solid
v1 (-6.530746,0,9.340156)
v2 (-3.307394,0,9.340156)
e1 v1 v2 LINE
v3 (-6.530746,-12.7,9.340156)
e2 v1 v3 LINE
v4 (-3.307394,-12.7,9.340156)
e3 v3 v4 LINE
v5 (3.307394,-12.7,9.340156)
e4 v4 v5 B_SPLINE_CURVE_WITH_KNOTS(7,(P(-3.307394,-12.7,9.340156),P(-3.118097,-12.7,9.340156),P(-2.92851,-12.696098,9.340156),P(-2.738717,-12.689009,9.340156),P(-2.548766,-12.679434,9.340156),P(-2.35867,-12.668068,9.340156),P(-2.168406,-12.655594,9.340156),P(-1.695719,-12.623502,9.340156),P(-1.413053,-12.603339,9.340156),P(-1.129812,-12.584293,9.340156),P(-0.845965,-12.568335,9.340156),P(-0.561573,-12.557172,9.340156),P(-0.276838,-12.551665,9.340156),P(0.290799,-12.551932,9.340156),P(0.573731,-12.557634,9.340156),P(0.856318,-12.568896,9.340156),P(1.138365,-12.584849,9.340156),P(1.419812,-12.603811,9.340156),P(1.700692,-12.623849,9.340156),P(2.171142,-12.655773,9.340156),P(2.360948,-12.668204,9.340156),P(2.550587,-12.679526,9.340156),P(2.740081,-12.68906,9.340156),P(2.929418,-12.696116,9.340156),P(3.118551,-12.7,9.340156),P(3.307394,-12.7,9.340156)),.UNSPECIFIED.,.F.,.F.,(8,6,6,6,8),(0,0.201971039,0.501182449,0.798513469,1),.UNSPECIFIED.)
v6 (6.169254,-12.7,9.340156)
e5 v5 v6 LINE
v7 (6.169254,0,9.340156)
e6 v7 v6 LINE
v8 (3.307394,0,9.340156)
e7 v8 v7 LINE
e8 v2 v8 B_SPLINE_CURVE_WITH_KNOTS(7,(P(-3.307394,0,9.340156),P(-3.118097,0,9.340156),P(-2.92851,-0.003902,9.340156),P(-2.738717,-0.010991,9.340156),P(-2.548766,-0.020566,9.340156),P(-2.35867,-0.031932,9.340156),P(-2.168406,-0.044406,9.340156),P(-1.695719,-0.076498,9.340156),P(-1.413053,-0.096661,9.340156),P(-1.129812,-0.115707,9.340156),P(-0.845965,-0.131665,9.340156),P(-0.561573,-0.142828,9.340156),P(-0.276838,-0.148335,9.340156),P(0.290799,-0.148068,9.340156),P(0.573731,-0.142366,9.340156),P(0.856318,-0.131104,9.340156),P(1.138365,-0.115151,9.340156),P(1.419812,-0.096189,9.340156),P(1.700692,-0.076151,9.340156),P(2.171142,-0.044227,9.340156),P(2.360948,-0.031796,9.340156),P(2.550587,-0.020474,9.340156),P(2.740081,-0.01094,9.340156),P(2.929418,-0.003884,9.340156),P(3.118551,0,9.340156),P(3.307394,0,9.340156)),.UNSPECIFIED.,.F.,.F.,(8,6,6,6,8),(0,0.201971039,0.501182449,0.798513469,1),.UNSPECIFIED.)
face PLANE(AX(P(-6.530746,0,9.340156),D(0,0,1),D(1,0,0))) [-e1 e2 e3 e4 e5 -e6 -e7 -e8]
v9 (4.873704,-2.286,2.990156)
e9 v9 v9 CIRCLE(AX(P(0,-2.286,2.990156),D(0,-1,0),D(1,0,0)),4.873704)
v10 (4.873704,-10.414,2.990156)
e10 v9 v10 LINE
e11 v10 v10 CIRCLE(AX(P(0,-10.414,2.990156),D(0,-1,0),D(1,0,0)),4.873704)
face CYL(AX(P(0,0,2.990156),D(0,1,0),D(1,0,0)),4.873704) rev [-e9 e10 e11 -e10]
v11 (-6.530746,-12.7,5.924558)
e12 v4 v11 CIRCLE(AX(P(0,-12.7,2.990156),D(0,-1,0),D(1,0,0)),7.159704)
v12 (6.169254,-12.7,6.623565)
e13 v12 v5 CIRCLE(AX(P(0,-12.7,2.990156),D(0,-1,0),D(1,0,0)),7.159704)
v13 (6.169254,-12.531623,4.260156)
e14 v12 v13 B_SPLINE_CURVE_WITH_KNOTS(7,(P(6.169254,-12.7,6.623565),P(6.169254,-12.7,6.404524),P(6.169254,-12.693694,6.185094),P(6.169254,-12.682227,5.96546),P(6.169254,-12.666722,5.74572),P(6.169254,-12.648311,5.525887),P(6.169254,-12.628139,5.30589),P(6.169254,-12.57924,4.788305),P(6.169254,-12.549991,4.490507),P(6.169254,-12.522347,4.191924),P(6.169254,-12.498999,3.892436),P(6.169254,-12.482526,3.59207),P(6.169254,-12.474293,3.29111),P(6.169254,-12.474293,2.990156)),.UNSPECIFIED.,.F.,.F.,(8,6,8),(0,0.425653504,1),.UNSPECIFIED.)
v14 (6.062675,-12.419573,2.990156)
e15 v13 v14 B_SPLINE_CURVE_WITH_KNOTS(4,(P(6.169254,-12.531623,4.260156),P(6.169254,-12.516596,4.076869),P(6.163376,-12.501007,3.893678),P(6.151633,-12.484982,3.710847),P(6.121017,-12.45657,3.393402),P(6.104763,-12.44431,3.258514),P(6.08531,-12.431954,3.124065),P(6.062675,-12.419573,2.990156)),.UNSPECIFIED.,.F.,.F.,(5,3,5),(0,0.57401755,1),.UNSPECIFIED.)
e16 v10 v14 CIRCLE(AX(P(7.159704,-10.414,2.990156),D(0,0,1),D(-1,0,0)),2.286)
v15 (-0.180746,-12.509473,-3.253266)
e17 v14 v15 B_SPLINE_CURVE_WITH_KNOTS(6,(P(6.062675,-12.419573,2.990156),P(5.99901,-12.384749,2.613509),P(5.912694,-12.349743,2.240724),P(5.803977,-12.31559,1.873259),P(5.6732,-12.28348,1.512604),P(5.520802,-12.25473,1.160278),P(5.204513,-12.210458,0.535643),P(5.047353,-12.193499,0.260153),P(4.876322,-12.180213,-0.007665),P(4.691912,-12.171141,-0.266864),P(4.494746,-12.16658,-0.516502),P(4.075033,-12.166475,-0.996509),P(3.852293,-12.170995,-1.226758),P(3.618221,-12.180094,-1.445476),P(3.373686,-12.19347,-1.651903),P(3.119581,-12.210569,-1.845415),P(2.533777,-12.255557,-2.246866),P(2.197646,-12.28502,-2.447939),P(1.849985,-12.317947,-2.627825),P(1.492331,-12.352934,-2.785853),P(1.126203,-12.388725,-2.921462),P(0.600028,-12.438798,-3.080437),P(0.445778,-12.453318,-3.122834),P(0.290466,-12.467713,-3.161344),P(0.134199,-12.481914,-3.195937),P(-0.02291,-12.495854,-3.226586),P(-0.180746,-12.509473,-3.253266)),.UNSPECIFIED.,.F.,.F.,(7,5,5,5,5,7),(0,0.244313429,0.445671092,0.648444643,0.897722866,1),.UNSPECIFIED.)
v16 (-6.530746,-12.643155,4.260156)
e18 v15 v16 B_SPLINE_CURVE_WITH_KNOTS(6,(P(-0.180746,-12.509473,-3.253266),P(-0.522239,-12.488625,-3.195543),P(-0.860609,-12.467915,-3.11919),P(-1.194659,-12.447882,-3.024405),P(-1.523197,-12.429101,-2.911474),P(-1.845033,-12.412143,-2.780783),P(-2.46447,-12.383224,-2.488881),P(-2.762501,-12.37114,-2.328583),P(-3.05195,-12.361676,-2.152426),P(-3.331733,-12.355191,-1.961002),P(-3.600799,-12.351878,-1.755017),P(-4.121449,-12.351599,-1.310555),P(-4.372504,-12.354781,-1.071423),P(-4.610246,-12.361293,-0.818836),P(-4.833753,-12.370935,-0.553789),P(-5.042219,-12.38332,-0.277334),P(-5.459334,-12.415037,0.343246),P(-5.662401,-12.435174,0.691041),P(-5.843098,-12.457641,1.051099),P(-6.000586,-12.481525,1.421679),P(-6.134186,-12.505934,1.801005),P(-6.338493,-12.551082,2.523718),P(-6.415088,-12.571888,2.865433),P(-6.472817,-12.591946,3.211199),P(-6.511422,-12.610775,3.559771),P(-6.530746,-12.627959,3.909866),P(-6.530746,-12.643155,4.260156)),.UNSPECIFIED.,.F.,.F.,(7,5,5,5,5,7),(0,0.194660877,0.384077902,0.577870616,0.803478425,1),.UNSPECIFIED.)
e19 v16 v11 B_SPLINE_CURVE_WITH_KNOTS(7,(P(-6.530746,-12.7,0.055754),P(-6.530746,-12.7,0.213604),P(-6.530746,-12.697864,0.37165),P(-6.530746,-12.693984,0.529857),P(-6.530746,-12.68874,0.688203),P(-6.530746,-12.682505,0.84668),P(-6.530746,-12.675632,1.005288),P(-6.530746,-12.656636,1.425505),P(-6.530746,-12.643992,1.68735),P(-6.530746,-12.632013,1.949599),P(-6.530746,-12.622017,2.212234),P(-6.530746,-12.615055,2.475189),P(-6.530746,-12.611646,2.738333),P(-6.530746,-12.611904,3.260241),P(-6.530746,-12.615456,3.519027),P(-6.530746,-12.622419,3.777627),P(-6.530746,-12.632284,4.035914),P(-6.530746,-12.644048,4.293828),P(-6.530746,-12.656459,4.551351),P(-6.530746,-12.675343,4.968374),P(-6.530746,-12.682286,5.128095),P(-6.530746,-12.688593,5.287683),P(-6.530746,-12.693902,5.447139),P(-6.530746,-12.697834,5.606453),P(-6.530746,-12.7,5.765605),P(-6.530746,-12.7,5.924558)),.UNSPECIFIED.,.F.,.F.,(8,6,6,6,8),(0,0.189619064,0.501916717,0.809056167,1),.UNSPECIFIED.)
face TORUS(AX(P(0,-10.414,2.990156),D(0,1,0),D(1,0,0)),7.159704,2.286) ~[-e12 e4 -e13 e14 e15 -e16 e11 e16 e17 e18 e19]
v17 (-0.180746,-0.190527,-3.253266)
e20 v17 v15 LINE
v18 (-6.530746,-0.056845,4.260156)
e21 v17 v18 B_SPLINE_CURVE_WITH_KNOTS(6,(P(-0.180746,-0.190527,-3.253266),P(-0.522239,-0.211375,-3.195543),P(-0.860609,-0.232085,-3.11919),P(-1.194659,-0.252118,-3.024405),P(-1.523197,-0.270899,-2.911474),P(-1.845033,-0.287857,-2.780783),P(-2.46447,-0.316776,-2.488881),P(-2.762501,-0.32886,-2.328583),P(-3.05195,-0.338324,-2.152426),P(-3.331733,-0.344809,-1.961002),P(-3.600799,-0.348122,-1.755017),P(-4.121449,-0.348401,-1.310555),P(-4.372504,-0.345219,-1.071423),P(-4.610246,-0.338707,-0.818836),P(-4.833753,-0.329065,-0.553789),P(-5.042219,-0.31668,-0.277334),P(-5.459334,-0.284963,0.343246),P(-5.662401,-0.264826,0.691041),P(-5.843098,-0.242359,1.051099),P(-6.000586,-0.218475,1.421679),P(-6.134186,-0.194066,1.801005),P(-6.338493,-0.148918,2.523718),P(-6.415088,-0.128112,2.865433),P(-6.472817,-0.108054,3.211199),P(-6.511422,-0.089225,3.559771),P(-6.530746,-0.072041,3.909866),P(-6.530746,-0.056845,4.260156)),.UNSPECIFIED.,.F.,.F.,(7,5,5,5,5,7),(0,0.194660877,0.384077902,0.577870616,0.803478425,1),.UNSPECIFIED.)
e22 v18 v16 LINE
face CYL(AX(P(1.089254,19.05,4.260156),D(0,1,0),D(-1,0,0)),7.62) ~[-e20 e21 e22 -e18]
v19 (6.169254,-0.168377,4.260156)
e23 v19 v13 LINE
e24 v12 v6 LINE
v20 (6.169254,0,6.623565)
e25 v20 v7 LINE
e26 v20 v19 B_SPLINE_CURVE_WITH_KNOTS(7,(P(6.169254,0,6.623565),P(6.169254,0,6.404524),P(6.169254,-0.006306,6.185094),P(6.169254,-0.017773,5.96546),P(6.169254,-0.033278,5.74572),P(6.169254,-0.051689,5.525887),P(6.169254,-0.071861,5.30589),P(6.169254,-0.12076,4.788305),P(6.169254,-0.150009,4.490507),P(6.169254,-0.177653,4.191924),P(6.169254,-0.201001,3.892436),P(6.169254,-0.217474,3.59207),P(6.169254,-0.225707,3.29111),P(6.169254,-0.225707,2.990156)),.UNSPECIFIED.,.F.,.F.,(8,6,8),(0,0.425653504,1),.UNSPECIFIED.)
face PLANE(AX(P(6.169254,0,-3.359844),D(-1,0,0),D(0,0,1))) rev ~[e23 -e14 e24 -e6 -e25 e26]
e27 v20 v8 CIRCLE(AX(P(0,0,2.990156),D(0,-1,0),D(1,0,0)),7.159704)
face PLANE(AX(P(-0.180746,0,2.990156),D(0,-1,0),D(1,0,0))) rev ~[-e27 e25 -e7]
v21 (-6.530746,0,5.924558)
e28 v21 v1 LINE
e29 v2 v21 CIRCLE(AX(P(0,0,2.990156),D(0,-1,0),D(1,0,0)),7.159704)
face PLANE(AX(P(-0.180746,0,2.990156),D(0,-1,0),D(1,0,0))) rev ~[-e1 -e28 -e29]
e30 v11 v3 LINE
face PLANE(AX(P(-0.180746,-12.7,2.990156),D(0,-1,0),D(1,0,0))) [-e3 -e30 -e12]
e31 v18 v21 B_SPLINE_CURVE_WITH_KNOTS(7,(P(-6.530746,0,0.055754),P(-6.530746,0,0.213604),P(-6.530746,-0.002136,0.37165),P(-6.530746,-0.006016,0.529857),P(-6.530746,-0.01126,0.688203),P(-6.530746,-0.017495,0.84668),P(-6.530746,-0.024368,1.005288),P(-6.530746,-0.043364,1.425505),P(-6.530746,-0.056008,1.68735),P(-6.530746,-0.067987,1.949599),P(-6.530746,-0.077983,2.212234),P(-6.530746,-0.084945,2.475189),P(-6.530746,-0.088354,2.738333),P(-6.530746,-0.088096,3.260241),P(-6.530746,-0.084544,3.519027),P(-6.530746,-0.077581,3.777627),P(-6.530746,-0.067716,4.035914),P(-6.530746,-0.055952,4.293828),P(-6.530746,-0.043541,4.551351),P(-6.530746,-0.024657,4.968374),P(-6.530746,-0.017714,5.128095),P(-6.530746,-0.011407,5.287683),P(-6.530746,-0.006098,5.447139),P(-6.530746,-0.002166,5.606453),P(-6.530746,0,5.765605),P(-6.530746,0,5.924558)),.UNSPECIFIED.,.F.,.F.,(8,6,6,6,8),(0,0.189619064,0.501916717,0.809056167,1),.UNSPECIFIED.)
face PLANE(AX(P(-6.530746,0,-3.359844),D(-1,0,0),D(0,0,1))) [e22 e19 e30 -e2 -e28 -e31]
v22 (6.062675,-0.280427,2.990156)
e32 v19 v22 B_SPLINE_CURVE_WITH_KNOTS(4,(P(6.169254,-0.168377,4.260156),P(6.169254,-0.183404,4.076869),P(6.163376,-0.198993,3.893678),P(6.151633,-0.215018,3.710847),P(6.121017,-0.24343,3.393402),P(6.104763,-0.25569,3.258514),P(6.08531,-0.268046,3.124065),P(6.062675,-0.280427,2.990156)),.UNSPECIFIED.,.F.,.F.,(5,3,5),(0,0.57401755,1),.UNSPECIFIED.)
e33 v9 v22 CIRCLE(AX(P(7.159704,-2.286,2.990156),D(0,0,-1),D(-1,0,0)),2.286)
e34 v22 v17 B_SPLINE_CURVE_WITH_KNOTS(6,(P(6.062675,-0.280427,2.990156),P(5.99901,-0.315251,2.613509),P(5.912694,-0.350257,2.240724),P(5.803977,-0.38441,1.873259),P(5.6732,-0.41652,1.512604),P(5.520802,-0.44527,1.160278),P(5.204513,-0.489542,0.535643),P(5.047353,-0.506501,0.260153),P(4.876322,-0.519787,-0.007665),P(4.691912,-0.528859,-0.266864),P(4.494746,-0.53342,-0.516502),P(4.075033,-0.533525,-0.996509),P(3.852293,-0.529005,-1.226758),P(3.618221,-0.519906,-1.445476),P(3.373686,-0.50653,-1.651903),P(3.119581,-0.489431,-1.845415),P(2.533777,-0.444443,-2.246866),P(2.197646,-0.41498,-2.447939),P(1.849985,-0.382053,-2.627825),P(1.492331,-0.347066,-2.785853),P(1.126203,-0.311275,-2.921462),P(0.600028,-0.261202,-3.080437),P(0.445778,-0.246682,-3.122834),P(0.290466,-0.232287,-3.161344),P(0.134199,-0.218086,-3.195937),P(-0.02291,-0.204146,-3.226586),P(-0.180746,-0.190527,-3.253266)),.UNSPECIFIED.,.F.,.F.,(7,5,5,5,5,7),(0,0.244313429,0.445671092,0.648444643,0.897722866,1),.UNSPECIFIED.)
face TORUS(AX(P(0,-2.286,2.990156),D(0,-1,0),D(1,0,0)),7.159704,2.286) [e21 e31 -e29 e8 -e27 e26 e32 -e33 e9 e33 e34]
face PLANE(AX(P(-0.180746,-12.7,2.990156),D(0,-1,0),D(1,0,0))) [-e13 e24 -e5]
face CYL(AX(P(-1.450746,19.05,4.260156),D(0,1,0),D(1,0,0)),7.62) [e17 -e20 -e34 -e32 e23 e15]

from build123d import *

# Parameters (mm, degrees)
F0_W        = 12.7
F0_H        = 12.7
F0_R        = 4.8737037562
F1_DEPTH    = 12.7
F3_T1_DEPTH = 50.8


# Not quite as in the source:
# - a fillet or chamfer that OpenCascade refuses, or shapes differently, is made with other operations: its cross-section is extruded or revolved along the edge and cut away or added


with BuildPart() as f1:
    # F0 (on Front) → F1 (new body)
    with BuildSketch(Plane.XZ):
        with Locations((-0.180745963, 2.9901557426)):
            Rectangle(F0_W, F0_H)
        with Locations((0, 2.9901557426)):
            Circle(F0_R, mode=Mode.SUBTRACT)
    extrude(amount=F1_DEPTH)

    # F2: fillet of radius 2.286 on 2 edges, made by hand

    # F2_s1 → F2_t2 (revolve, cut)
    with BuildSketch(Plane.XY.offset(2.9901557426)):
        with BuildLine():
            ThreePointArc((4.8737037562, -10.414), (5.5432576544, -12.0304461018), (7.1597037562, -12.7))
            Line((7.1597037562, -12.7), (4.8737037562, -12.7))
            Line((4.8737037562, -12.7), (4.8737037562, -10.414))
        make_face()
    revolve(axis=Axis((0, -12.7, 2.9901557426), (0, -1, 0)), mode=Mode.SUBTRACT)

    # F2_s3 → F2_t4 (revolve, cut)
    with BuildSketch(Plane.XY.offset(2.9901557426)):
        with BuildLine():
            ThreePointArc((4.8737037562, -2.286), (5.5432576544, -0.6695538982), (7.1597037562, 0))
            Line((7.1597037562, 0), (4.8737037562, 0))
            Line((4.8737037562, 0), (4.8737037562, -2.286))
        make_face()
    revolve(axis=Axis((0, 0, 2.9901557426), (0, -1, 0)), mode=Mode.SUBTRACT)

    # F3: fillet of radius 7.62 on 2 edges, made by hand

    # F3_s2 → F3_t1 (cut)
    with BuildSketch(Plane.XZ.offset(-19.05)):
        with BuildLine():
            ThreePointArc((6.169254037, 4.2601557426), (3.9374077096, -1.12799793), (-1.450745963, -3.3598442574))
            Line((-1.450745963, -3.3598442574), (6.169254037, -3.3598442574))
            Line((6.169254037, -3.3598442574), (6.169254037, 4.2601557426))
        make_face()
        with BuildLine():
            ThreePointArc((-6.530745963, 4.2601557426), (-4.2988996356, -1.12799793), (1.089254037, -3.3598442574))
            Line((1.089254037, -3.3598442574), (-6.530745963, -3.3598442574))
            Line((-6.530745963, -3.3598442574), (-6.530745963, 4.2601557426))
        make_face()
    extrude(amount=F3_T1_DEPTH, mode=Mode.SUBTRACT)


solid = f1.part
